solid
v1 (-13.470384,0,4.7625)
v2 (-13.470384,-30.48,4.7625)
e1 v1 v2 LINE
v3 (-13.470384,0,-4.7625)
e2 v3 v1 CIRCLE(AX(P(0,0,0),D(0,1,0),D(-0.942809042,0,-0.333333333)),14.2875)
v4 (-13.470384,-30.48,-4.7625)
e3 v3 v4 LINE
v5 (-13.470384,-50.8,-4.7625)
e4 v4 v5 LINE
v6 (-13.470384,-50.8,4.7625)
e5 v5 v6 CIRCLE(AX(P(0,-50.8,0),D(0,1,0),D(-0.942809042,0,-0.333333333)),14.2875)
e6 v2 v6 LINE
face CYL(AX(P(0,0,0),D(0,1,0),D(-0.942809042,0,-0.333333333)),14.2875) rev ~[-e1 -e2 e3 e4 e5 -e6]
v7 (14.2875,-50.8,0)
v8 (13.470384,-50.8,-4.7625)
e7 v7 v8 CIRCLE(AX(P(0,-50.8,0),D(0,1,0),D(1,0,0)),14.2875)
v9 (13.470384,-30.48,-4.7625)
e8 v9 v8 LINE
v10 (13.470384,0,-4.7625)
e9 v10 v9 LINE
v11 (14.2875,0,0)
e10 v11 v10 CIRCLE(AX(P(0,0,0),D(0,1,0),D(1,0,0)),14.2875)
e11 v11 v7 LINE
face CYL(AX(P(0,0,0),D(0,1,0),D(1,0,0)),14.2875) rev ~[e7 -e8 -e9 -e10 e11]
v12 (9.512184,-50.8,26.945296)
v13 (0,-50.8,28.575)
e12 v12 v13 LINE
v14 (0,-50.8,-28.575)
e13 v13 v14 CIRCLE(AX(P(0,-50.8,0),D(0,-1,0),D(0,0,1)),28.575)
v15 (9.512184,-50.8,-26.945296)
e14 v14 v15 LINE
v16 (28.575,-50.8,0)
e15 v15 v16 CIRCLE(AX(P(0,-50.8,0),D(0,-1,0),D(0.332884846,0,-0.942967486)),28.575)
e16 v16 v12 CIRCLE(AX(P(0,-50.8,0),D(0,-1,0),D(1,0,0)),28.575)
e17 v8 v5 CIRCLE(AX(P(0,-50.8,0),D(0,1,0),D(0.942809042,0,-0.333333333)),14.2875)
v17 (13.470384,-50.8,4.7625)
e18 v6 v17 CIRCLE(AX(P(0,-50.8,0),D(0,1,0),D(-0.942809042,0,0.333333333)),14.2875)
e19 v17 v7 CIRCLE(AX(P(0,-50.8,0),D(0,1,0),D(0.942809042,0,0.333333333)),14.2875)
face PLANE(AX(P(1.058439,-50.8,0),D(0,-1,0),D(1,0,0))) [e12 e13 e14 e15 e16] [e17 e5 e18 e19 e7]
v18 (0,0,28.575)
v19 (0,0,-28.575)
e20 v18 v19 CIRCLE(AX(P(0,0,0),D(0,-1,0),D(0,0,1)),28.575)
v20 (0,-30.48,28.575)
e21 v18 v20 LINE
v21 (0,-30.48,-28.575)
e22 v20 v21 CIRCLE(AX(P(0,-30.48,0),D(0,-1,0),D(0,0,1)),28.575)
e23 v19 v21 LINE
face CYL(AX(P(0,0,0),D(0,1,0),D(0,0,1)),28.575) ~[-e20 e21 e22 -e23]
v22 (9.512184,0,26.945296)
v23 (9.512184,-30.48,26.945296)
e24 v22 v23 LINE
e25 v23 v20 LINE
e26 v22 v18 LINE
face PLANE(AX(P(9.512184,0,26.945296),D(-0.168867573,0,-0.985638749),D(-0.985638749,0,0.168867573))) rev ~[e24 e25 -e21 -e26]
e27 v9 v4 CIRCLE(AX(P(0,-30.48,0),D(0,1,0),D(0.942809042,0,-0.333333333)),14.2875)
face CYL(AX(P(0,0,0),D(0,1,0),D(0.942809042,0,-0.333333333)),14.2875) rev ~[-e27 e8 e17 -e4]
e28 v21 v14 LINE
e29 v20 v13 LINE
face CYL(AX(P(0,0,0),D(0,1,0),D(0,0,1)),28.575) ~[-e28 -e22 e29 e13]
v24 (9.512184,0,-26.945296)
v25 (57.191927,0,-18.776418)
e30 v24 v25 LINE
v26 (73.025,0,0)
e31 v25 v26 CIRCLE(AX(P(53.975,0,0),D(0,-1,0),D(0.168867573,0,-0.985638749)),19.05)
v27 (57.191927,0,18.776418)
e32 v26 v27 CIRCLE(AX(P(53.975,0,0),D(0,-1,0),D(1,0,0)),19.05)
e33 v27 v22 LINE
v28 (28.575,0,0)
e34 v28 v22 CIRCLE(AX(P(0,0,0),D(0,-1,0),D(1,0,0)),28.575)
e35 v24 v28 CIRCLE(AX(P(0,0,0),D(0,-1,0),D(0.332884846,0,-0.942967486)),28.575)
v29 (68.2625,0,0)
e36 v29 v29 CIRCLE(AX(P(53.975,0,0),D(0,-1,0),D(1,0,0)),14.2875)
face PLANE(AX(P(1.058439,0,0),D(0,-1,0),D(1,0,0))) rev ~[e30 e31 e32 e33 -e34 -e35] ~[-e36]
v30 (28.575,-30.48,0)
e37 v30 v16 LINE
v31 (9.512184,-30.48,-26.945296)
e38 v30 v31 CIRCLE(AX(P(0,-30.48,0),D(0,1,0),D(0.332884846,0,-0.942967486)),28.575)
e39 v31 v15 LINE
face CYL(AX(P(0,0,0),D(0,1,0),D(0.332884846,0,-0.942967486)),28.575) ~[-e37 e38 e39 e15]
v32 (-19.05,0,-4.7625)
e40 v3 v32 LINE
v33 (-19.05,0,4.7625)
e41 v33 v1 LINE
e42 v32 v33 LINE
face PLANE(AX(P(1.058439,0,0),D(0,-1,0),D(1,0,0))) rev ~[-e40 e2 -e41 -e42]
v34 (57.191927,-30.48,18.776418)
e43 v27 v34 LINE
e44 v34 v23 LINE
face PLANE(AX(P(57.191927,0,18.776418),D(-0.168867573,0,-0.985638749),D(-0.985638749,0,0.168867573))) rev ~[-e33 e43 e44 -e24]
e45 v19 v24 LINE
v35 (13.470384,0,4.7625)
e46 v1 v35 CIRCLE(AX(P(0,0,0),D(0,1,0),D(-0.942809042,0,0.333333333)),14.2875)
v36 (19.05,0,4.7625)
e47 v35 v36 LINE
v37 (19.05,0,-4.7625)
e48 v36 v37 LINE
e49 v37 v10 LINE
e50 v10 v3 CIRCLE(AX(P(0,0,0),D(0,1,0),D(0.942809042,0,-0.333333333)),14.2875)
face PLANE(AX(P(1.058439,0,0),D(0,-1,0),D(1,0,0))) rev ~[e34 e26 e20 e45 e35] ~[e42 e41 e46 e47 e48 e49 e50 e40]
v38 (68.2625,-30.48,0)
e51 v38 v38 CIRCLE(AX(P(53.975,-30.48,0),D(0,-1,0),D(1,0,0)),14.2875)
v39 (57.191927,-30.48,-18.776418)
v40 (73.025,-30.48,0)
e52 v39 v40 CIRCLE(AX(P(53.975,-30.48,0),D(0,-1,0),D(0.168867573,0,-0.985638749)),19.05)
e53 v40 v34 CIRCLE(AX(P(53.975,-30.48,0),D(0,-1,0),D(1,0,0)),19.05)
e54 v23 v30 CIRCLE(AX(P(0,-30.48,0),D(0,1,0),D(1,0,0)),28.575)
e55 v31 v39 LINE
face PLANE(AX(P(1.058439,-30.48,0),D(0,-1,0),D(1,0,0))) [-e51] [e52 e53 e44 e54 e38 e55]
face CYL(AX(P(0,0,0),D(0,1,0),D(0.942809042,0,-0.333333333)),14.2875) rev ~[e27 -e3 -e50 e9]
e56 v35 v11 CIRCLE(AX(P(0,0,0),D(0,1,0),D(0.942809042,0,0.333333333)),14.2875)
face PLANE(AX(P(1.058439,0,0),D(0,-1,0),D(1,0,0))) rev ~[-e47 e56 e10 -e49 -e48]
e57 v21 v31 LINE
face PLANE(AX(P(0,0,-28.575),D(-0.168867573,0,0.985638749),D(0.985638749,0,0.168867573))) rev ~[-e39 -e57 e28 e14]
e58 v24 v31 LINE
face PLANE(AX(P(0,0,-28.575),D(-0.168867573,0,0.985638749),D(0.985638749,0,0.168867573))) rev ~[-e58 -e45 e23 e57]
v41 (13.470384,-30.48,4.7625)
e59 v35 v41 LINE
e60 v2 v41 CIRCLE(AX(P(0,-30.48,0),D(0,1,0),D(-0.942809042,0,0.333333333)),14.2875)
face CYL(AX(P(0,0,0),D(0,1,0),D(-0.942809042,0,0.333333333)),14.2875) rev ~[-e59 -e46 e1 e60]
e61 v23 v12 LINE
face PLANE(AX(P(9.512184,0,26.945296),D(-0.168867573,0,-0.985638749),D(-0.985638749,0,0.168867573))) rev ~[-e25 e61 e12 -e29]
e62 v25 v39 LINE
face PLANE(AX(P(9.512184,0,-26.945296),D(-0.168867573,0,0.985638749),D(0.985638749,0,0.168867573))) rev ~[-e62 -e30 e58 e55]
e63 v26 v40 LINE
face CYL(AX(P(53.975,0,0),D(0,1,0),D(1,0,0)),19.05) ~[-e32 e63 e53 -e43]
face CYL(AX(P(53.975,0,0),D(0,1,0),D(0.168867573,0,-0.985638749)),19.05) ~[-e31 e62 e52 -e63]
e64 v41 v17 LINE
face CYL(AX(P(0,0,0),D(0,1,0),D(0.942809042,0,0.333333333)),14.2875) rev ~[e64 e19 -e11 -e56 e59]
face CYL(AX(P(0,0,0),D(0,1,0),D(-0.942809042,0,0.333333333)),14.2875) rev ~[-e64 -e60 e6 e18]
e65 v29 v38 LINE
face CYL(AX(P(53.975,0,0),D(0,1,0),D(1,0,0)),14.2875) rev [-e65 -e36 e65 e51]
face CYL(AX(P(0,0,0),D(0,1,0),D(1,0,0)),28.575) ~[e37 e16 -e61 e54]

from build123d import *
from build123d import SkipClean  # not in build123d's __all__

# Parameters (mm, degrees)
F0_R     = 14.2875
F1_DEPTH = 30.48
F2_DEPTH = 50.8


with BuildPart() as f1:
    # F0 (on Front) → F1 (new body)
    with BuildSketch(Plane.XZ):
        with BuildLine():
            Line((9.5121844836, 26.9452959039), (0, 28.575))
            ThreePointArc((0, 28.575), (-28.575, 0), (0, -28.575))
            Line((0, -28.575), (9.5121844836, -26.9452959039))
            ThreePointArc((9.5121844836, -26.9452959039), (23.3274655355, -16.5033322905), (28.575, 0))
            ThreePointArc((28.575, 0), (23.3274655355, 16.5033322905), (9.5121844836, 26.9452959039))
        make_face()
        with BuildLine():
            ThreePointArc((-13.4703841816, 4.7625), (0, 14.2875), (13.4703841816, 4.7625))
            Line((13.4703841816, 4.7625), (19.05, 4.7625))
            Line((19.05, 4.7625), (19.05, -4.7625))
            Line((19.05, -4.7625), (13.4703841816, -4.7625))
            ThreePointArc((13.4703841816, -4.7625), (0, -14.2875), (-13.4703841816, -4.7625))
            Line((-13.4703841816, -4.7625), (-19.05, -4.7625))
            Line((-19.05, -4.7625), (-19.05, 4.7625))
            Line((-19.05, 4.7625), (-13.4703841816, 4.7625))
        make_face(mode=Mode.SUBTRACT)
        with BuildLine():
            Line((57.1919272622, 18.7764181619), (9.5121844836, 26.9452959039))
            ThreePointArc((9.5121844836, 26.9452959039), (23.3274655355, 16.5033322905), (28.575, 0))
            ThreePointArc((28.575, 0), (23.3274655355, -16.5033322905), (9.5121844836, -26.9452959039))
            Line((9.5121844836, -26.9452959039), (57.1919272622, -18.7764181619))
            ThreePointArc((57.1919272622, -18.7764181619), (34.925, 0), (57.1919272622, 18.7764181619))
        make_face()
        with BuildLine():
            ThreePointArc((73.025, 0), (68.5383952831, 12.2804730295), (57.1919272622, 18.7764181619))
            ThreePointArc((57.1919272622, 18.7764181619), (34.925, 0), (57.1919272622, -18.7764181619))
            ThreePointArc((57.1919272622, -18.7764181619), (68.5383952831, -12.2804730295), (73.025, 0))
        make_face()
        with Locations((53.975, 0)):
            Circle(F0_R, mode=Mode.SUBTRACT)
    extrude(amount=F1_DEPTH)

    # F0 (on Front) → F2 (join)
    with BuildSketch(Plane.XZ):
        with BuildLine():
            Line((9.5121844836, 26.9452959039), (0, 28.575))
            ThreePointArc((0, 28.575), (-28.575, 0), (0, -28.575))
            Line((0, -28.575), (9.5121844836, -26.9452959039))
            ThreePointArc((9.5121844836, -26.9452959039), (23.3274655355, -16.5033322905), (28.575, 0))
            ThreePointArc((28.575, 0), (23.3274655355, 16.5033322905), (9.5121844836, 26.9452959039))
        make_face()
        with BuildLine():
            ThreePointArc((-13.4703841816, 4.7625), (0, 14.2875), (13.4703841816, 4.7625))
            Line((13.4703841816, 4.7625), (19.05, 4.7625))
            Line((19.05, 4.7625), (19.05, -4.7625))
            Line((19.05, -4.7625), (13.4703841816, -4.7625))
            ThreePointArc((13.4703841816, -4.7625), (0, -14.2875), (-13.4703841816, -4.7625))
            Line((-13.4703841816, -4.7625), (-19.05, -4.7625))
            Line((-19.05, -4.7625), (-19.05, 4.7625))
            Line((-19.05, 4.7625), (-13.4703841816, 4.7625))
        make_face(mode=Mode.SUBTRACT)
        with BuildLine():
            ThreePointArc((-13.4703841816, -4.7625), (-14.2875, 0), (-13.4703841816, 4.7625))
            Line((-13.4703841816, 4.7625), (-19.05, 4.7625))
            Line((-19.05, 4.7625), (-19.05, -4.7625))
            Line((-19.05, -4.7625), (-13.4703841816, -4.7625))
        make_face()
        with BuildLine():
            ThreePointArc((13.4703841816, 4.7625), (14.081739421, 2.416044521), (14.2875, 0))
            ThreePointArc((14.2875, 0), (14.081739421, -2.416044521), (13.4703841816, -4.7625))
            Line((13.4703841816, -4.7625), (19.05, -4.7625))
            Line((19.05, -4.7625), (19.05, 4.7625))
            Line((19.05, 4.7625), (13.4703841816, 4.7625))
        make_face()
    with SkipClean():  # cleaning this boolean's faces spoils the solid; the shape is the same uncleaned
        extrude(amount=F2_DEPTH)


solid = f1.part
